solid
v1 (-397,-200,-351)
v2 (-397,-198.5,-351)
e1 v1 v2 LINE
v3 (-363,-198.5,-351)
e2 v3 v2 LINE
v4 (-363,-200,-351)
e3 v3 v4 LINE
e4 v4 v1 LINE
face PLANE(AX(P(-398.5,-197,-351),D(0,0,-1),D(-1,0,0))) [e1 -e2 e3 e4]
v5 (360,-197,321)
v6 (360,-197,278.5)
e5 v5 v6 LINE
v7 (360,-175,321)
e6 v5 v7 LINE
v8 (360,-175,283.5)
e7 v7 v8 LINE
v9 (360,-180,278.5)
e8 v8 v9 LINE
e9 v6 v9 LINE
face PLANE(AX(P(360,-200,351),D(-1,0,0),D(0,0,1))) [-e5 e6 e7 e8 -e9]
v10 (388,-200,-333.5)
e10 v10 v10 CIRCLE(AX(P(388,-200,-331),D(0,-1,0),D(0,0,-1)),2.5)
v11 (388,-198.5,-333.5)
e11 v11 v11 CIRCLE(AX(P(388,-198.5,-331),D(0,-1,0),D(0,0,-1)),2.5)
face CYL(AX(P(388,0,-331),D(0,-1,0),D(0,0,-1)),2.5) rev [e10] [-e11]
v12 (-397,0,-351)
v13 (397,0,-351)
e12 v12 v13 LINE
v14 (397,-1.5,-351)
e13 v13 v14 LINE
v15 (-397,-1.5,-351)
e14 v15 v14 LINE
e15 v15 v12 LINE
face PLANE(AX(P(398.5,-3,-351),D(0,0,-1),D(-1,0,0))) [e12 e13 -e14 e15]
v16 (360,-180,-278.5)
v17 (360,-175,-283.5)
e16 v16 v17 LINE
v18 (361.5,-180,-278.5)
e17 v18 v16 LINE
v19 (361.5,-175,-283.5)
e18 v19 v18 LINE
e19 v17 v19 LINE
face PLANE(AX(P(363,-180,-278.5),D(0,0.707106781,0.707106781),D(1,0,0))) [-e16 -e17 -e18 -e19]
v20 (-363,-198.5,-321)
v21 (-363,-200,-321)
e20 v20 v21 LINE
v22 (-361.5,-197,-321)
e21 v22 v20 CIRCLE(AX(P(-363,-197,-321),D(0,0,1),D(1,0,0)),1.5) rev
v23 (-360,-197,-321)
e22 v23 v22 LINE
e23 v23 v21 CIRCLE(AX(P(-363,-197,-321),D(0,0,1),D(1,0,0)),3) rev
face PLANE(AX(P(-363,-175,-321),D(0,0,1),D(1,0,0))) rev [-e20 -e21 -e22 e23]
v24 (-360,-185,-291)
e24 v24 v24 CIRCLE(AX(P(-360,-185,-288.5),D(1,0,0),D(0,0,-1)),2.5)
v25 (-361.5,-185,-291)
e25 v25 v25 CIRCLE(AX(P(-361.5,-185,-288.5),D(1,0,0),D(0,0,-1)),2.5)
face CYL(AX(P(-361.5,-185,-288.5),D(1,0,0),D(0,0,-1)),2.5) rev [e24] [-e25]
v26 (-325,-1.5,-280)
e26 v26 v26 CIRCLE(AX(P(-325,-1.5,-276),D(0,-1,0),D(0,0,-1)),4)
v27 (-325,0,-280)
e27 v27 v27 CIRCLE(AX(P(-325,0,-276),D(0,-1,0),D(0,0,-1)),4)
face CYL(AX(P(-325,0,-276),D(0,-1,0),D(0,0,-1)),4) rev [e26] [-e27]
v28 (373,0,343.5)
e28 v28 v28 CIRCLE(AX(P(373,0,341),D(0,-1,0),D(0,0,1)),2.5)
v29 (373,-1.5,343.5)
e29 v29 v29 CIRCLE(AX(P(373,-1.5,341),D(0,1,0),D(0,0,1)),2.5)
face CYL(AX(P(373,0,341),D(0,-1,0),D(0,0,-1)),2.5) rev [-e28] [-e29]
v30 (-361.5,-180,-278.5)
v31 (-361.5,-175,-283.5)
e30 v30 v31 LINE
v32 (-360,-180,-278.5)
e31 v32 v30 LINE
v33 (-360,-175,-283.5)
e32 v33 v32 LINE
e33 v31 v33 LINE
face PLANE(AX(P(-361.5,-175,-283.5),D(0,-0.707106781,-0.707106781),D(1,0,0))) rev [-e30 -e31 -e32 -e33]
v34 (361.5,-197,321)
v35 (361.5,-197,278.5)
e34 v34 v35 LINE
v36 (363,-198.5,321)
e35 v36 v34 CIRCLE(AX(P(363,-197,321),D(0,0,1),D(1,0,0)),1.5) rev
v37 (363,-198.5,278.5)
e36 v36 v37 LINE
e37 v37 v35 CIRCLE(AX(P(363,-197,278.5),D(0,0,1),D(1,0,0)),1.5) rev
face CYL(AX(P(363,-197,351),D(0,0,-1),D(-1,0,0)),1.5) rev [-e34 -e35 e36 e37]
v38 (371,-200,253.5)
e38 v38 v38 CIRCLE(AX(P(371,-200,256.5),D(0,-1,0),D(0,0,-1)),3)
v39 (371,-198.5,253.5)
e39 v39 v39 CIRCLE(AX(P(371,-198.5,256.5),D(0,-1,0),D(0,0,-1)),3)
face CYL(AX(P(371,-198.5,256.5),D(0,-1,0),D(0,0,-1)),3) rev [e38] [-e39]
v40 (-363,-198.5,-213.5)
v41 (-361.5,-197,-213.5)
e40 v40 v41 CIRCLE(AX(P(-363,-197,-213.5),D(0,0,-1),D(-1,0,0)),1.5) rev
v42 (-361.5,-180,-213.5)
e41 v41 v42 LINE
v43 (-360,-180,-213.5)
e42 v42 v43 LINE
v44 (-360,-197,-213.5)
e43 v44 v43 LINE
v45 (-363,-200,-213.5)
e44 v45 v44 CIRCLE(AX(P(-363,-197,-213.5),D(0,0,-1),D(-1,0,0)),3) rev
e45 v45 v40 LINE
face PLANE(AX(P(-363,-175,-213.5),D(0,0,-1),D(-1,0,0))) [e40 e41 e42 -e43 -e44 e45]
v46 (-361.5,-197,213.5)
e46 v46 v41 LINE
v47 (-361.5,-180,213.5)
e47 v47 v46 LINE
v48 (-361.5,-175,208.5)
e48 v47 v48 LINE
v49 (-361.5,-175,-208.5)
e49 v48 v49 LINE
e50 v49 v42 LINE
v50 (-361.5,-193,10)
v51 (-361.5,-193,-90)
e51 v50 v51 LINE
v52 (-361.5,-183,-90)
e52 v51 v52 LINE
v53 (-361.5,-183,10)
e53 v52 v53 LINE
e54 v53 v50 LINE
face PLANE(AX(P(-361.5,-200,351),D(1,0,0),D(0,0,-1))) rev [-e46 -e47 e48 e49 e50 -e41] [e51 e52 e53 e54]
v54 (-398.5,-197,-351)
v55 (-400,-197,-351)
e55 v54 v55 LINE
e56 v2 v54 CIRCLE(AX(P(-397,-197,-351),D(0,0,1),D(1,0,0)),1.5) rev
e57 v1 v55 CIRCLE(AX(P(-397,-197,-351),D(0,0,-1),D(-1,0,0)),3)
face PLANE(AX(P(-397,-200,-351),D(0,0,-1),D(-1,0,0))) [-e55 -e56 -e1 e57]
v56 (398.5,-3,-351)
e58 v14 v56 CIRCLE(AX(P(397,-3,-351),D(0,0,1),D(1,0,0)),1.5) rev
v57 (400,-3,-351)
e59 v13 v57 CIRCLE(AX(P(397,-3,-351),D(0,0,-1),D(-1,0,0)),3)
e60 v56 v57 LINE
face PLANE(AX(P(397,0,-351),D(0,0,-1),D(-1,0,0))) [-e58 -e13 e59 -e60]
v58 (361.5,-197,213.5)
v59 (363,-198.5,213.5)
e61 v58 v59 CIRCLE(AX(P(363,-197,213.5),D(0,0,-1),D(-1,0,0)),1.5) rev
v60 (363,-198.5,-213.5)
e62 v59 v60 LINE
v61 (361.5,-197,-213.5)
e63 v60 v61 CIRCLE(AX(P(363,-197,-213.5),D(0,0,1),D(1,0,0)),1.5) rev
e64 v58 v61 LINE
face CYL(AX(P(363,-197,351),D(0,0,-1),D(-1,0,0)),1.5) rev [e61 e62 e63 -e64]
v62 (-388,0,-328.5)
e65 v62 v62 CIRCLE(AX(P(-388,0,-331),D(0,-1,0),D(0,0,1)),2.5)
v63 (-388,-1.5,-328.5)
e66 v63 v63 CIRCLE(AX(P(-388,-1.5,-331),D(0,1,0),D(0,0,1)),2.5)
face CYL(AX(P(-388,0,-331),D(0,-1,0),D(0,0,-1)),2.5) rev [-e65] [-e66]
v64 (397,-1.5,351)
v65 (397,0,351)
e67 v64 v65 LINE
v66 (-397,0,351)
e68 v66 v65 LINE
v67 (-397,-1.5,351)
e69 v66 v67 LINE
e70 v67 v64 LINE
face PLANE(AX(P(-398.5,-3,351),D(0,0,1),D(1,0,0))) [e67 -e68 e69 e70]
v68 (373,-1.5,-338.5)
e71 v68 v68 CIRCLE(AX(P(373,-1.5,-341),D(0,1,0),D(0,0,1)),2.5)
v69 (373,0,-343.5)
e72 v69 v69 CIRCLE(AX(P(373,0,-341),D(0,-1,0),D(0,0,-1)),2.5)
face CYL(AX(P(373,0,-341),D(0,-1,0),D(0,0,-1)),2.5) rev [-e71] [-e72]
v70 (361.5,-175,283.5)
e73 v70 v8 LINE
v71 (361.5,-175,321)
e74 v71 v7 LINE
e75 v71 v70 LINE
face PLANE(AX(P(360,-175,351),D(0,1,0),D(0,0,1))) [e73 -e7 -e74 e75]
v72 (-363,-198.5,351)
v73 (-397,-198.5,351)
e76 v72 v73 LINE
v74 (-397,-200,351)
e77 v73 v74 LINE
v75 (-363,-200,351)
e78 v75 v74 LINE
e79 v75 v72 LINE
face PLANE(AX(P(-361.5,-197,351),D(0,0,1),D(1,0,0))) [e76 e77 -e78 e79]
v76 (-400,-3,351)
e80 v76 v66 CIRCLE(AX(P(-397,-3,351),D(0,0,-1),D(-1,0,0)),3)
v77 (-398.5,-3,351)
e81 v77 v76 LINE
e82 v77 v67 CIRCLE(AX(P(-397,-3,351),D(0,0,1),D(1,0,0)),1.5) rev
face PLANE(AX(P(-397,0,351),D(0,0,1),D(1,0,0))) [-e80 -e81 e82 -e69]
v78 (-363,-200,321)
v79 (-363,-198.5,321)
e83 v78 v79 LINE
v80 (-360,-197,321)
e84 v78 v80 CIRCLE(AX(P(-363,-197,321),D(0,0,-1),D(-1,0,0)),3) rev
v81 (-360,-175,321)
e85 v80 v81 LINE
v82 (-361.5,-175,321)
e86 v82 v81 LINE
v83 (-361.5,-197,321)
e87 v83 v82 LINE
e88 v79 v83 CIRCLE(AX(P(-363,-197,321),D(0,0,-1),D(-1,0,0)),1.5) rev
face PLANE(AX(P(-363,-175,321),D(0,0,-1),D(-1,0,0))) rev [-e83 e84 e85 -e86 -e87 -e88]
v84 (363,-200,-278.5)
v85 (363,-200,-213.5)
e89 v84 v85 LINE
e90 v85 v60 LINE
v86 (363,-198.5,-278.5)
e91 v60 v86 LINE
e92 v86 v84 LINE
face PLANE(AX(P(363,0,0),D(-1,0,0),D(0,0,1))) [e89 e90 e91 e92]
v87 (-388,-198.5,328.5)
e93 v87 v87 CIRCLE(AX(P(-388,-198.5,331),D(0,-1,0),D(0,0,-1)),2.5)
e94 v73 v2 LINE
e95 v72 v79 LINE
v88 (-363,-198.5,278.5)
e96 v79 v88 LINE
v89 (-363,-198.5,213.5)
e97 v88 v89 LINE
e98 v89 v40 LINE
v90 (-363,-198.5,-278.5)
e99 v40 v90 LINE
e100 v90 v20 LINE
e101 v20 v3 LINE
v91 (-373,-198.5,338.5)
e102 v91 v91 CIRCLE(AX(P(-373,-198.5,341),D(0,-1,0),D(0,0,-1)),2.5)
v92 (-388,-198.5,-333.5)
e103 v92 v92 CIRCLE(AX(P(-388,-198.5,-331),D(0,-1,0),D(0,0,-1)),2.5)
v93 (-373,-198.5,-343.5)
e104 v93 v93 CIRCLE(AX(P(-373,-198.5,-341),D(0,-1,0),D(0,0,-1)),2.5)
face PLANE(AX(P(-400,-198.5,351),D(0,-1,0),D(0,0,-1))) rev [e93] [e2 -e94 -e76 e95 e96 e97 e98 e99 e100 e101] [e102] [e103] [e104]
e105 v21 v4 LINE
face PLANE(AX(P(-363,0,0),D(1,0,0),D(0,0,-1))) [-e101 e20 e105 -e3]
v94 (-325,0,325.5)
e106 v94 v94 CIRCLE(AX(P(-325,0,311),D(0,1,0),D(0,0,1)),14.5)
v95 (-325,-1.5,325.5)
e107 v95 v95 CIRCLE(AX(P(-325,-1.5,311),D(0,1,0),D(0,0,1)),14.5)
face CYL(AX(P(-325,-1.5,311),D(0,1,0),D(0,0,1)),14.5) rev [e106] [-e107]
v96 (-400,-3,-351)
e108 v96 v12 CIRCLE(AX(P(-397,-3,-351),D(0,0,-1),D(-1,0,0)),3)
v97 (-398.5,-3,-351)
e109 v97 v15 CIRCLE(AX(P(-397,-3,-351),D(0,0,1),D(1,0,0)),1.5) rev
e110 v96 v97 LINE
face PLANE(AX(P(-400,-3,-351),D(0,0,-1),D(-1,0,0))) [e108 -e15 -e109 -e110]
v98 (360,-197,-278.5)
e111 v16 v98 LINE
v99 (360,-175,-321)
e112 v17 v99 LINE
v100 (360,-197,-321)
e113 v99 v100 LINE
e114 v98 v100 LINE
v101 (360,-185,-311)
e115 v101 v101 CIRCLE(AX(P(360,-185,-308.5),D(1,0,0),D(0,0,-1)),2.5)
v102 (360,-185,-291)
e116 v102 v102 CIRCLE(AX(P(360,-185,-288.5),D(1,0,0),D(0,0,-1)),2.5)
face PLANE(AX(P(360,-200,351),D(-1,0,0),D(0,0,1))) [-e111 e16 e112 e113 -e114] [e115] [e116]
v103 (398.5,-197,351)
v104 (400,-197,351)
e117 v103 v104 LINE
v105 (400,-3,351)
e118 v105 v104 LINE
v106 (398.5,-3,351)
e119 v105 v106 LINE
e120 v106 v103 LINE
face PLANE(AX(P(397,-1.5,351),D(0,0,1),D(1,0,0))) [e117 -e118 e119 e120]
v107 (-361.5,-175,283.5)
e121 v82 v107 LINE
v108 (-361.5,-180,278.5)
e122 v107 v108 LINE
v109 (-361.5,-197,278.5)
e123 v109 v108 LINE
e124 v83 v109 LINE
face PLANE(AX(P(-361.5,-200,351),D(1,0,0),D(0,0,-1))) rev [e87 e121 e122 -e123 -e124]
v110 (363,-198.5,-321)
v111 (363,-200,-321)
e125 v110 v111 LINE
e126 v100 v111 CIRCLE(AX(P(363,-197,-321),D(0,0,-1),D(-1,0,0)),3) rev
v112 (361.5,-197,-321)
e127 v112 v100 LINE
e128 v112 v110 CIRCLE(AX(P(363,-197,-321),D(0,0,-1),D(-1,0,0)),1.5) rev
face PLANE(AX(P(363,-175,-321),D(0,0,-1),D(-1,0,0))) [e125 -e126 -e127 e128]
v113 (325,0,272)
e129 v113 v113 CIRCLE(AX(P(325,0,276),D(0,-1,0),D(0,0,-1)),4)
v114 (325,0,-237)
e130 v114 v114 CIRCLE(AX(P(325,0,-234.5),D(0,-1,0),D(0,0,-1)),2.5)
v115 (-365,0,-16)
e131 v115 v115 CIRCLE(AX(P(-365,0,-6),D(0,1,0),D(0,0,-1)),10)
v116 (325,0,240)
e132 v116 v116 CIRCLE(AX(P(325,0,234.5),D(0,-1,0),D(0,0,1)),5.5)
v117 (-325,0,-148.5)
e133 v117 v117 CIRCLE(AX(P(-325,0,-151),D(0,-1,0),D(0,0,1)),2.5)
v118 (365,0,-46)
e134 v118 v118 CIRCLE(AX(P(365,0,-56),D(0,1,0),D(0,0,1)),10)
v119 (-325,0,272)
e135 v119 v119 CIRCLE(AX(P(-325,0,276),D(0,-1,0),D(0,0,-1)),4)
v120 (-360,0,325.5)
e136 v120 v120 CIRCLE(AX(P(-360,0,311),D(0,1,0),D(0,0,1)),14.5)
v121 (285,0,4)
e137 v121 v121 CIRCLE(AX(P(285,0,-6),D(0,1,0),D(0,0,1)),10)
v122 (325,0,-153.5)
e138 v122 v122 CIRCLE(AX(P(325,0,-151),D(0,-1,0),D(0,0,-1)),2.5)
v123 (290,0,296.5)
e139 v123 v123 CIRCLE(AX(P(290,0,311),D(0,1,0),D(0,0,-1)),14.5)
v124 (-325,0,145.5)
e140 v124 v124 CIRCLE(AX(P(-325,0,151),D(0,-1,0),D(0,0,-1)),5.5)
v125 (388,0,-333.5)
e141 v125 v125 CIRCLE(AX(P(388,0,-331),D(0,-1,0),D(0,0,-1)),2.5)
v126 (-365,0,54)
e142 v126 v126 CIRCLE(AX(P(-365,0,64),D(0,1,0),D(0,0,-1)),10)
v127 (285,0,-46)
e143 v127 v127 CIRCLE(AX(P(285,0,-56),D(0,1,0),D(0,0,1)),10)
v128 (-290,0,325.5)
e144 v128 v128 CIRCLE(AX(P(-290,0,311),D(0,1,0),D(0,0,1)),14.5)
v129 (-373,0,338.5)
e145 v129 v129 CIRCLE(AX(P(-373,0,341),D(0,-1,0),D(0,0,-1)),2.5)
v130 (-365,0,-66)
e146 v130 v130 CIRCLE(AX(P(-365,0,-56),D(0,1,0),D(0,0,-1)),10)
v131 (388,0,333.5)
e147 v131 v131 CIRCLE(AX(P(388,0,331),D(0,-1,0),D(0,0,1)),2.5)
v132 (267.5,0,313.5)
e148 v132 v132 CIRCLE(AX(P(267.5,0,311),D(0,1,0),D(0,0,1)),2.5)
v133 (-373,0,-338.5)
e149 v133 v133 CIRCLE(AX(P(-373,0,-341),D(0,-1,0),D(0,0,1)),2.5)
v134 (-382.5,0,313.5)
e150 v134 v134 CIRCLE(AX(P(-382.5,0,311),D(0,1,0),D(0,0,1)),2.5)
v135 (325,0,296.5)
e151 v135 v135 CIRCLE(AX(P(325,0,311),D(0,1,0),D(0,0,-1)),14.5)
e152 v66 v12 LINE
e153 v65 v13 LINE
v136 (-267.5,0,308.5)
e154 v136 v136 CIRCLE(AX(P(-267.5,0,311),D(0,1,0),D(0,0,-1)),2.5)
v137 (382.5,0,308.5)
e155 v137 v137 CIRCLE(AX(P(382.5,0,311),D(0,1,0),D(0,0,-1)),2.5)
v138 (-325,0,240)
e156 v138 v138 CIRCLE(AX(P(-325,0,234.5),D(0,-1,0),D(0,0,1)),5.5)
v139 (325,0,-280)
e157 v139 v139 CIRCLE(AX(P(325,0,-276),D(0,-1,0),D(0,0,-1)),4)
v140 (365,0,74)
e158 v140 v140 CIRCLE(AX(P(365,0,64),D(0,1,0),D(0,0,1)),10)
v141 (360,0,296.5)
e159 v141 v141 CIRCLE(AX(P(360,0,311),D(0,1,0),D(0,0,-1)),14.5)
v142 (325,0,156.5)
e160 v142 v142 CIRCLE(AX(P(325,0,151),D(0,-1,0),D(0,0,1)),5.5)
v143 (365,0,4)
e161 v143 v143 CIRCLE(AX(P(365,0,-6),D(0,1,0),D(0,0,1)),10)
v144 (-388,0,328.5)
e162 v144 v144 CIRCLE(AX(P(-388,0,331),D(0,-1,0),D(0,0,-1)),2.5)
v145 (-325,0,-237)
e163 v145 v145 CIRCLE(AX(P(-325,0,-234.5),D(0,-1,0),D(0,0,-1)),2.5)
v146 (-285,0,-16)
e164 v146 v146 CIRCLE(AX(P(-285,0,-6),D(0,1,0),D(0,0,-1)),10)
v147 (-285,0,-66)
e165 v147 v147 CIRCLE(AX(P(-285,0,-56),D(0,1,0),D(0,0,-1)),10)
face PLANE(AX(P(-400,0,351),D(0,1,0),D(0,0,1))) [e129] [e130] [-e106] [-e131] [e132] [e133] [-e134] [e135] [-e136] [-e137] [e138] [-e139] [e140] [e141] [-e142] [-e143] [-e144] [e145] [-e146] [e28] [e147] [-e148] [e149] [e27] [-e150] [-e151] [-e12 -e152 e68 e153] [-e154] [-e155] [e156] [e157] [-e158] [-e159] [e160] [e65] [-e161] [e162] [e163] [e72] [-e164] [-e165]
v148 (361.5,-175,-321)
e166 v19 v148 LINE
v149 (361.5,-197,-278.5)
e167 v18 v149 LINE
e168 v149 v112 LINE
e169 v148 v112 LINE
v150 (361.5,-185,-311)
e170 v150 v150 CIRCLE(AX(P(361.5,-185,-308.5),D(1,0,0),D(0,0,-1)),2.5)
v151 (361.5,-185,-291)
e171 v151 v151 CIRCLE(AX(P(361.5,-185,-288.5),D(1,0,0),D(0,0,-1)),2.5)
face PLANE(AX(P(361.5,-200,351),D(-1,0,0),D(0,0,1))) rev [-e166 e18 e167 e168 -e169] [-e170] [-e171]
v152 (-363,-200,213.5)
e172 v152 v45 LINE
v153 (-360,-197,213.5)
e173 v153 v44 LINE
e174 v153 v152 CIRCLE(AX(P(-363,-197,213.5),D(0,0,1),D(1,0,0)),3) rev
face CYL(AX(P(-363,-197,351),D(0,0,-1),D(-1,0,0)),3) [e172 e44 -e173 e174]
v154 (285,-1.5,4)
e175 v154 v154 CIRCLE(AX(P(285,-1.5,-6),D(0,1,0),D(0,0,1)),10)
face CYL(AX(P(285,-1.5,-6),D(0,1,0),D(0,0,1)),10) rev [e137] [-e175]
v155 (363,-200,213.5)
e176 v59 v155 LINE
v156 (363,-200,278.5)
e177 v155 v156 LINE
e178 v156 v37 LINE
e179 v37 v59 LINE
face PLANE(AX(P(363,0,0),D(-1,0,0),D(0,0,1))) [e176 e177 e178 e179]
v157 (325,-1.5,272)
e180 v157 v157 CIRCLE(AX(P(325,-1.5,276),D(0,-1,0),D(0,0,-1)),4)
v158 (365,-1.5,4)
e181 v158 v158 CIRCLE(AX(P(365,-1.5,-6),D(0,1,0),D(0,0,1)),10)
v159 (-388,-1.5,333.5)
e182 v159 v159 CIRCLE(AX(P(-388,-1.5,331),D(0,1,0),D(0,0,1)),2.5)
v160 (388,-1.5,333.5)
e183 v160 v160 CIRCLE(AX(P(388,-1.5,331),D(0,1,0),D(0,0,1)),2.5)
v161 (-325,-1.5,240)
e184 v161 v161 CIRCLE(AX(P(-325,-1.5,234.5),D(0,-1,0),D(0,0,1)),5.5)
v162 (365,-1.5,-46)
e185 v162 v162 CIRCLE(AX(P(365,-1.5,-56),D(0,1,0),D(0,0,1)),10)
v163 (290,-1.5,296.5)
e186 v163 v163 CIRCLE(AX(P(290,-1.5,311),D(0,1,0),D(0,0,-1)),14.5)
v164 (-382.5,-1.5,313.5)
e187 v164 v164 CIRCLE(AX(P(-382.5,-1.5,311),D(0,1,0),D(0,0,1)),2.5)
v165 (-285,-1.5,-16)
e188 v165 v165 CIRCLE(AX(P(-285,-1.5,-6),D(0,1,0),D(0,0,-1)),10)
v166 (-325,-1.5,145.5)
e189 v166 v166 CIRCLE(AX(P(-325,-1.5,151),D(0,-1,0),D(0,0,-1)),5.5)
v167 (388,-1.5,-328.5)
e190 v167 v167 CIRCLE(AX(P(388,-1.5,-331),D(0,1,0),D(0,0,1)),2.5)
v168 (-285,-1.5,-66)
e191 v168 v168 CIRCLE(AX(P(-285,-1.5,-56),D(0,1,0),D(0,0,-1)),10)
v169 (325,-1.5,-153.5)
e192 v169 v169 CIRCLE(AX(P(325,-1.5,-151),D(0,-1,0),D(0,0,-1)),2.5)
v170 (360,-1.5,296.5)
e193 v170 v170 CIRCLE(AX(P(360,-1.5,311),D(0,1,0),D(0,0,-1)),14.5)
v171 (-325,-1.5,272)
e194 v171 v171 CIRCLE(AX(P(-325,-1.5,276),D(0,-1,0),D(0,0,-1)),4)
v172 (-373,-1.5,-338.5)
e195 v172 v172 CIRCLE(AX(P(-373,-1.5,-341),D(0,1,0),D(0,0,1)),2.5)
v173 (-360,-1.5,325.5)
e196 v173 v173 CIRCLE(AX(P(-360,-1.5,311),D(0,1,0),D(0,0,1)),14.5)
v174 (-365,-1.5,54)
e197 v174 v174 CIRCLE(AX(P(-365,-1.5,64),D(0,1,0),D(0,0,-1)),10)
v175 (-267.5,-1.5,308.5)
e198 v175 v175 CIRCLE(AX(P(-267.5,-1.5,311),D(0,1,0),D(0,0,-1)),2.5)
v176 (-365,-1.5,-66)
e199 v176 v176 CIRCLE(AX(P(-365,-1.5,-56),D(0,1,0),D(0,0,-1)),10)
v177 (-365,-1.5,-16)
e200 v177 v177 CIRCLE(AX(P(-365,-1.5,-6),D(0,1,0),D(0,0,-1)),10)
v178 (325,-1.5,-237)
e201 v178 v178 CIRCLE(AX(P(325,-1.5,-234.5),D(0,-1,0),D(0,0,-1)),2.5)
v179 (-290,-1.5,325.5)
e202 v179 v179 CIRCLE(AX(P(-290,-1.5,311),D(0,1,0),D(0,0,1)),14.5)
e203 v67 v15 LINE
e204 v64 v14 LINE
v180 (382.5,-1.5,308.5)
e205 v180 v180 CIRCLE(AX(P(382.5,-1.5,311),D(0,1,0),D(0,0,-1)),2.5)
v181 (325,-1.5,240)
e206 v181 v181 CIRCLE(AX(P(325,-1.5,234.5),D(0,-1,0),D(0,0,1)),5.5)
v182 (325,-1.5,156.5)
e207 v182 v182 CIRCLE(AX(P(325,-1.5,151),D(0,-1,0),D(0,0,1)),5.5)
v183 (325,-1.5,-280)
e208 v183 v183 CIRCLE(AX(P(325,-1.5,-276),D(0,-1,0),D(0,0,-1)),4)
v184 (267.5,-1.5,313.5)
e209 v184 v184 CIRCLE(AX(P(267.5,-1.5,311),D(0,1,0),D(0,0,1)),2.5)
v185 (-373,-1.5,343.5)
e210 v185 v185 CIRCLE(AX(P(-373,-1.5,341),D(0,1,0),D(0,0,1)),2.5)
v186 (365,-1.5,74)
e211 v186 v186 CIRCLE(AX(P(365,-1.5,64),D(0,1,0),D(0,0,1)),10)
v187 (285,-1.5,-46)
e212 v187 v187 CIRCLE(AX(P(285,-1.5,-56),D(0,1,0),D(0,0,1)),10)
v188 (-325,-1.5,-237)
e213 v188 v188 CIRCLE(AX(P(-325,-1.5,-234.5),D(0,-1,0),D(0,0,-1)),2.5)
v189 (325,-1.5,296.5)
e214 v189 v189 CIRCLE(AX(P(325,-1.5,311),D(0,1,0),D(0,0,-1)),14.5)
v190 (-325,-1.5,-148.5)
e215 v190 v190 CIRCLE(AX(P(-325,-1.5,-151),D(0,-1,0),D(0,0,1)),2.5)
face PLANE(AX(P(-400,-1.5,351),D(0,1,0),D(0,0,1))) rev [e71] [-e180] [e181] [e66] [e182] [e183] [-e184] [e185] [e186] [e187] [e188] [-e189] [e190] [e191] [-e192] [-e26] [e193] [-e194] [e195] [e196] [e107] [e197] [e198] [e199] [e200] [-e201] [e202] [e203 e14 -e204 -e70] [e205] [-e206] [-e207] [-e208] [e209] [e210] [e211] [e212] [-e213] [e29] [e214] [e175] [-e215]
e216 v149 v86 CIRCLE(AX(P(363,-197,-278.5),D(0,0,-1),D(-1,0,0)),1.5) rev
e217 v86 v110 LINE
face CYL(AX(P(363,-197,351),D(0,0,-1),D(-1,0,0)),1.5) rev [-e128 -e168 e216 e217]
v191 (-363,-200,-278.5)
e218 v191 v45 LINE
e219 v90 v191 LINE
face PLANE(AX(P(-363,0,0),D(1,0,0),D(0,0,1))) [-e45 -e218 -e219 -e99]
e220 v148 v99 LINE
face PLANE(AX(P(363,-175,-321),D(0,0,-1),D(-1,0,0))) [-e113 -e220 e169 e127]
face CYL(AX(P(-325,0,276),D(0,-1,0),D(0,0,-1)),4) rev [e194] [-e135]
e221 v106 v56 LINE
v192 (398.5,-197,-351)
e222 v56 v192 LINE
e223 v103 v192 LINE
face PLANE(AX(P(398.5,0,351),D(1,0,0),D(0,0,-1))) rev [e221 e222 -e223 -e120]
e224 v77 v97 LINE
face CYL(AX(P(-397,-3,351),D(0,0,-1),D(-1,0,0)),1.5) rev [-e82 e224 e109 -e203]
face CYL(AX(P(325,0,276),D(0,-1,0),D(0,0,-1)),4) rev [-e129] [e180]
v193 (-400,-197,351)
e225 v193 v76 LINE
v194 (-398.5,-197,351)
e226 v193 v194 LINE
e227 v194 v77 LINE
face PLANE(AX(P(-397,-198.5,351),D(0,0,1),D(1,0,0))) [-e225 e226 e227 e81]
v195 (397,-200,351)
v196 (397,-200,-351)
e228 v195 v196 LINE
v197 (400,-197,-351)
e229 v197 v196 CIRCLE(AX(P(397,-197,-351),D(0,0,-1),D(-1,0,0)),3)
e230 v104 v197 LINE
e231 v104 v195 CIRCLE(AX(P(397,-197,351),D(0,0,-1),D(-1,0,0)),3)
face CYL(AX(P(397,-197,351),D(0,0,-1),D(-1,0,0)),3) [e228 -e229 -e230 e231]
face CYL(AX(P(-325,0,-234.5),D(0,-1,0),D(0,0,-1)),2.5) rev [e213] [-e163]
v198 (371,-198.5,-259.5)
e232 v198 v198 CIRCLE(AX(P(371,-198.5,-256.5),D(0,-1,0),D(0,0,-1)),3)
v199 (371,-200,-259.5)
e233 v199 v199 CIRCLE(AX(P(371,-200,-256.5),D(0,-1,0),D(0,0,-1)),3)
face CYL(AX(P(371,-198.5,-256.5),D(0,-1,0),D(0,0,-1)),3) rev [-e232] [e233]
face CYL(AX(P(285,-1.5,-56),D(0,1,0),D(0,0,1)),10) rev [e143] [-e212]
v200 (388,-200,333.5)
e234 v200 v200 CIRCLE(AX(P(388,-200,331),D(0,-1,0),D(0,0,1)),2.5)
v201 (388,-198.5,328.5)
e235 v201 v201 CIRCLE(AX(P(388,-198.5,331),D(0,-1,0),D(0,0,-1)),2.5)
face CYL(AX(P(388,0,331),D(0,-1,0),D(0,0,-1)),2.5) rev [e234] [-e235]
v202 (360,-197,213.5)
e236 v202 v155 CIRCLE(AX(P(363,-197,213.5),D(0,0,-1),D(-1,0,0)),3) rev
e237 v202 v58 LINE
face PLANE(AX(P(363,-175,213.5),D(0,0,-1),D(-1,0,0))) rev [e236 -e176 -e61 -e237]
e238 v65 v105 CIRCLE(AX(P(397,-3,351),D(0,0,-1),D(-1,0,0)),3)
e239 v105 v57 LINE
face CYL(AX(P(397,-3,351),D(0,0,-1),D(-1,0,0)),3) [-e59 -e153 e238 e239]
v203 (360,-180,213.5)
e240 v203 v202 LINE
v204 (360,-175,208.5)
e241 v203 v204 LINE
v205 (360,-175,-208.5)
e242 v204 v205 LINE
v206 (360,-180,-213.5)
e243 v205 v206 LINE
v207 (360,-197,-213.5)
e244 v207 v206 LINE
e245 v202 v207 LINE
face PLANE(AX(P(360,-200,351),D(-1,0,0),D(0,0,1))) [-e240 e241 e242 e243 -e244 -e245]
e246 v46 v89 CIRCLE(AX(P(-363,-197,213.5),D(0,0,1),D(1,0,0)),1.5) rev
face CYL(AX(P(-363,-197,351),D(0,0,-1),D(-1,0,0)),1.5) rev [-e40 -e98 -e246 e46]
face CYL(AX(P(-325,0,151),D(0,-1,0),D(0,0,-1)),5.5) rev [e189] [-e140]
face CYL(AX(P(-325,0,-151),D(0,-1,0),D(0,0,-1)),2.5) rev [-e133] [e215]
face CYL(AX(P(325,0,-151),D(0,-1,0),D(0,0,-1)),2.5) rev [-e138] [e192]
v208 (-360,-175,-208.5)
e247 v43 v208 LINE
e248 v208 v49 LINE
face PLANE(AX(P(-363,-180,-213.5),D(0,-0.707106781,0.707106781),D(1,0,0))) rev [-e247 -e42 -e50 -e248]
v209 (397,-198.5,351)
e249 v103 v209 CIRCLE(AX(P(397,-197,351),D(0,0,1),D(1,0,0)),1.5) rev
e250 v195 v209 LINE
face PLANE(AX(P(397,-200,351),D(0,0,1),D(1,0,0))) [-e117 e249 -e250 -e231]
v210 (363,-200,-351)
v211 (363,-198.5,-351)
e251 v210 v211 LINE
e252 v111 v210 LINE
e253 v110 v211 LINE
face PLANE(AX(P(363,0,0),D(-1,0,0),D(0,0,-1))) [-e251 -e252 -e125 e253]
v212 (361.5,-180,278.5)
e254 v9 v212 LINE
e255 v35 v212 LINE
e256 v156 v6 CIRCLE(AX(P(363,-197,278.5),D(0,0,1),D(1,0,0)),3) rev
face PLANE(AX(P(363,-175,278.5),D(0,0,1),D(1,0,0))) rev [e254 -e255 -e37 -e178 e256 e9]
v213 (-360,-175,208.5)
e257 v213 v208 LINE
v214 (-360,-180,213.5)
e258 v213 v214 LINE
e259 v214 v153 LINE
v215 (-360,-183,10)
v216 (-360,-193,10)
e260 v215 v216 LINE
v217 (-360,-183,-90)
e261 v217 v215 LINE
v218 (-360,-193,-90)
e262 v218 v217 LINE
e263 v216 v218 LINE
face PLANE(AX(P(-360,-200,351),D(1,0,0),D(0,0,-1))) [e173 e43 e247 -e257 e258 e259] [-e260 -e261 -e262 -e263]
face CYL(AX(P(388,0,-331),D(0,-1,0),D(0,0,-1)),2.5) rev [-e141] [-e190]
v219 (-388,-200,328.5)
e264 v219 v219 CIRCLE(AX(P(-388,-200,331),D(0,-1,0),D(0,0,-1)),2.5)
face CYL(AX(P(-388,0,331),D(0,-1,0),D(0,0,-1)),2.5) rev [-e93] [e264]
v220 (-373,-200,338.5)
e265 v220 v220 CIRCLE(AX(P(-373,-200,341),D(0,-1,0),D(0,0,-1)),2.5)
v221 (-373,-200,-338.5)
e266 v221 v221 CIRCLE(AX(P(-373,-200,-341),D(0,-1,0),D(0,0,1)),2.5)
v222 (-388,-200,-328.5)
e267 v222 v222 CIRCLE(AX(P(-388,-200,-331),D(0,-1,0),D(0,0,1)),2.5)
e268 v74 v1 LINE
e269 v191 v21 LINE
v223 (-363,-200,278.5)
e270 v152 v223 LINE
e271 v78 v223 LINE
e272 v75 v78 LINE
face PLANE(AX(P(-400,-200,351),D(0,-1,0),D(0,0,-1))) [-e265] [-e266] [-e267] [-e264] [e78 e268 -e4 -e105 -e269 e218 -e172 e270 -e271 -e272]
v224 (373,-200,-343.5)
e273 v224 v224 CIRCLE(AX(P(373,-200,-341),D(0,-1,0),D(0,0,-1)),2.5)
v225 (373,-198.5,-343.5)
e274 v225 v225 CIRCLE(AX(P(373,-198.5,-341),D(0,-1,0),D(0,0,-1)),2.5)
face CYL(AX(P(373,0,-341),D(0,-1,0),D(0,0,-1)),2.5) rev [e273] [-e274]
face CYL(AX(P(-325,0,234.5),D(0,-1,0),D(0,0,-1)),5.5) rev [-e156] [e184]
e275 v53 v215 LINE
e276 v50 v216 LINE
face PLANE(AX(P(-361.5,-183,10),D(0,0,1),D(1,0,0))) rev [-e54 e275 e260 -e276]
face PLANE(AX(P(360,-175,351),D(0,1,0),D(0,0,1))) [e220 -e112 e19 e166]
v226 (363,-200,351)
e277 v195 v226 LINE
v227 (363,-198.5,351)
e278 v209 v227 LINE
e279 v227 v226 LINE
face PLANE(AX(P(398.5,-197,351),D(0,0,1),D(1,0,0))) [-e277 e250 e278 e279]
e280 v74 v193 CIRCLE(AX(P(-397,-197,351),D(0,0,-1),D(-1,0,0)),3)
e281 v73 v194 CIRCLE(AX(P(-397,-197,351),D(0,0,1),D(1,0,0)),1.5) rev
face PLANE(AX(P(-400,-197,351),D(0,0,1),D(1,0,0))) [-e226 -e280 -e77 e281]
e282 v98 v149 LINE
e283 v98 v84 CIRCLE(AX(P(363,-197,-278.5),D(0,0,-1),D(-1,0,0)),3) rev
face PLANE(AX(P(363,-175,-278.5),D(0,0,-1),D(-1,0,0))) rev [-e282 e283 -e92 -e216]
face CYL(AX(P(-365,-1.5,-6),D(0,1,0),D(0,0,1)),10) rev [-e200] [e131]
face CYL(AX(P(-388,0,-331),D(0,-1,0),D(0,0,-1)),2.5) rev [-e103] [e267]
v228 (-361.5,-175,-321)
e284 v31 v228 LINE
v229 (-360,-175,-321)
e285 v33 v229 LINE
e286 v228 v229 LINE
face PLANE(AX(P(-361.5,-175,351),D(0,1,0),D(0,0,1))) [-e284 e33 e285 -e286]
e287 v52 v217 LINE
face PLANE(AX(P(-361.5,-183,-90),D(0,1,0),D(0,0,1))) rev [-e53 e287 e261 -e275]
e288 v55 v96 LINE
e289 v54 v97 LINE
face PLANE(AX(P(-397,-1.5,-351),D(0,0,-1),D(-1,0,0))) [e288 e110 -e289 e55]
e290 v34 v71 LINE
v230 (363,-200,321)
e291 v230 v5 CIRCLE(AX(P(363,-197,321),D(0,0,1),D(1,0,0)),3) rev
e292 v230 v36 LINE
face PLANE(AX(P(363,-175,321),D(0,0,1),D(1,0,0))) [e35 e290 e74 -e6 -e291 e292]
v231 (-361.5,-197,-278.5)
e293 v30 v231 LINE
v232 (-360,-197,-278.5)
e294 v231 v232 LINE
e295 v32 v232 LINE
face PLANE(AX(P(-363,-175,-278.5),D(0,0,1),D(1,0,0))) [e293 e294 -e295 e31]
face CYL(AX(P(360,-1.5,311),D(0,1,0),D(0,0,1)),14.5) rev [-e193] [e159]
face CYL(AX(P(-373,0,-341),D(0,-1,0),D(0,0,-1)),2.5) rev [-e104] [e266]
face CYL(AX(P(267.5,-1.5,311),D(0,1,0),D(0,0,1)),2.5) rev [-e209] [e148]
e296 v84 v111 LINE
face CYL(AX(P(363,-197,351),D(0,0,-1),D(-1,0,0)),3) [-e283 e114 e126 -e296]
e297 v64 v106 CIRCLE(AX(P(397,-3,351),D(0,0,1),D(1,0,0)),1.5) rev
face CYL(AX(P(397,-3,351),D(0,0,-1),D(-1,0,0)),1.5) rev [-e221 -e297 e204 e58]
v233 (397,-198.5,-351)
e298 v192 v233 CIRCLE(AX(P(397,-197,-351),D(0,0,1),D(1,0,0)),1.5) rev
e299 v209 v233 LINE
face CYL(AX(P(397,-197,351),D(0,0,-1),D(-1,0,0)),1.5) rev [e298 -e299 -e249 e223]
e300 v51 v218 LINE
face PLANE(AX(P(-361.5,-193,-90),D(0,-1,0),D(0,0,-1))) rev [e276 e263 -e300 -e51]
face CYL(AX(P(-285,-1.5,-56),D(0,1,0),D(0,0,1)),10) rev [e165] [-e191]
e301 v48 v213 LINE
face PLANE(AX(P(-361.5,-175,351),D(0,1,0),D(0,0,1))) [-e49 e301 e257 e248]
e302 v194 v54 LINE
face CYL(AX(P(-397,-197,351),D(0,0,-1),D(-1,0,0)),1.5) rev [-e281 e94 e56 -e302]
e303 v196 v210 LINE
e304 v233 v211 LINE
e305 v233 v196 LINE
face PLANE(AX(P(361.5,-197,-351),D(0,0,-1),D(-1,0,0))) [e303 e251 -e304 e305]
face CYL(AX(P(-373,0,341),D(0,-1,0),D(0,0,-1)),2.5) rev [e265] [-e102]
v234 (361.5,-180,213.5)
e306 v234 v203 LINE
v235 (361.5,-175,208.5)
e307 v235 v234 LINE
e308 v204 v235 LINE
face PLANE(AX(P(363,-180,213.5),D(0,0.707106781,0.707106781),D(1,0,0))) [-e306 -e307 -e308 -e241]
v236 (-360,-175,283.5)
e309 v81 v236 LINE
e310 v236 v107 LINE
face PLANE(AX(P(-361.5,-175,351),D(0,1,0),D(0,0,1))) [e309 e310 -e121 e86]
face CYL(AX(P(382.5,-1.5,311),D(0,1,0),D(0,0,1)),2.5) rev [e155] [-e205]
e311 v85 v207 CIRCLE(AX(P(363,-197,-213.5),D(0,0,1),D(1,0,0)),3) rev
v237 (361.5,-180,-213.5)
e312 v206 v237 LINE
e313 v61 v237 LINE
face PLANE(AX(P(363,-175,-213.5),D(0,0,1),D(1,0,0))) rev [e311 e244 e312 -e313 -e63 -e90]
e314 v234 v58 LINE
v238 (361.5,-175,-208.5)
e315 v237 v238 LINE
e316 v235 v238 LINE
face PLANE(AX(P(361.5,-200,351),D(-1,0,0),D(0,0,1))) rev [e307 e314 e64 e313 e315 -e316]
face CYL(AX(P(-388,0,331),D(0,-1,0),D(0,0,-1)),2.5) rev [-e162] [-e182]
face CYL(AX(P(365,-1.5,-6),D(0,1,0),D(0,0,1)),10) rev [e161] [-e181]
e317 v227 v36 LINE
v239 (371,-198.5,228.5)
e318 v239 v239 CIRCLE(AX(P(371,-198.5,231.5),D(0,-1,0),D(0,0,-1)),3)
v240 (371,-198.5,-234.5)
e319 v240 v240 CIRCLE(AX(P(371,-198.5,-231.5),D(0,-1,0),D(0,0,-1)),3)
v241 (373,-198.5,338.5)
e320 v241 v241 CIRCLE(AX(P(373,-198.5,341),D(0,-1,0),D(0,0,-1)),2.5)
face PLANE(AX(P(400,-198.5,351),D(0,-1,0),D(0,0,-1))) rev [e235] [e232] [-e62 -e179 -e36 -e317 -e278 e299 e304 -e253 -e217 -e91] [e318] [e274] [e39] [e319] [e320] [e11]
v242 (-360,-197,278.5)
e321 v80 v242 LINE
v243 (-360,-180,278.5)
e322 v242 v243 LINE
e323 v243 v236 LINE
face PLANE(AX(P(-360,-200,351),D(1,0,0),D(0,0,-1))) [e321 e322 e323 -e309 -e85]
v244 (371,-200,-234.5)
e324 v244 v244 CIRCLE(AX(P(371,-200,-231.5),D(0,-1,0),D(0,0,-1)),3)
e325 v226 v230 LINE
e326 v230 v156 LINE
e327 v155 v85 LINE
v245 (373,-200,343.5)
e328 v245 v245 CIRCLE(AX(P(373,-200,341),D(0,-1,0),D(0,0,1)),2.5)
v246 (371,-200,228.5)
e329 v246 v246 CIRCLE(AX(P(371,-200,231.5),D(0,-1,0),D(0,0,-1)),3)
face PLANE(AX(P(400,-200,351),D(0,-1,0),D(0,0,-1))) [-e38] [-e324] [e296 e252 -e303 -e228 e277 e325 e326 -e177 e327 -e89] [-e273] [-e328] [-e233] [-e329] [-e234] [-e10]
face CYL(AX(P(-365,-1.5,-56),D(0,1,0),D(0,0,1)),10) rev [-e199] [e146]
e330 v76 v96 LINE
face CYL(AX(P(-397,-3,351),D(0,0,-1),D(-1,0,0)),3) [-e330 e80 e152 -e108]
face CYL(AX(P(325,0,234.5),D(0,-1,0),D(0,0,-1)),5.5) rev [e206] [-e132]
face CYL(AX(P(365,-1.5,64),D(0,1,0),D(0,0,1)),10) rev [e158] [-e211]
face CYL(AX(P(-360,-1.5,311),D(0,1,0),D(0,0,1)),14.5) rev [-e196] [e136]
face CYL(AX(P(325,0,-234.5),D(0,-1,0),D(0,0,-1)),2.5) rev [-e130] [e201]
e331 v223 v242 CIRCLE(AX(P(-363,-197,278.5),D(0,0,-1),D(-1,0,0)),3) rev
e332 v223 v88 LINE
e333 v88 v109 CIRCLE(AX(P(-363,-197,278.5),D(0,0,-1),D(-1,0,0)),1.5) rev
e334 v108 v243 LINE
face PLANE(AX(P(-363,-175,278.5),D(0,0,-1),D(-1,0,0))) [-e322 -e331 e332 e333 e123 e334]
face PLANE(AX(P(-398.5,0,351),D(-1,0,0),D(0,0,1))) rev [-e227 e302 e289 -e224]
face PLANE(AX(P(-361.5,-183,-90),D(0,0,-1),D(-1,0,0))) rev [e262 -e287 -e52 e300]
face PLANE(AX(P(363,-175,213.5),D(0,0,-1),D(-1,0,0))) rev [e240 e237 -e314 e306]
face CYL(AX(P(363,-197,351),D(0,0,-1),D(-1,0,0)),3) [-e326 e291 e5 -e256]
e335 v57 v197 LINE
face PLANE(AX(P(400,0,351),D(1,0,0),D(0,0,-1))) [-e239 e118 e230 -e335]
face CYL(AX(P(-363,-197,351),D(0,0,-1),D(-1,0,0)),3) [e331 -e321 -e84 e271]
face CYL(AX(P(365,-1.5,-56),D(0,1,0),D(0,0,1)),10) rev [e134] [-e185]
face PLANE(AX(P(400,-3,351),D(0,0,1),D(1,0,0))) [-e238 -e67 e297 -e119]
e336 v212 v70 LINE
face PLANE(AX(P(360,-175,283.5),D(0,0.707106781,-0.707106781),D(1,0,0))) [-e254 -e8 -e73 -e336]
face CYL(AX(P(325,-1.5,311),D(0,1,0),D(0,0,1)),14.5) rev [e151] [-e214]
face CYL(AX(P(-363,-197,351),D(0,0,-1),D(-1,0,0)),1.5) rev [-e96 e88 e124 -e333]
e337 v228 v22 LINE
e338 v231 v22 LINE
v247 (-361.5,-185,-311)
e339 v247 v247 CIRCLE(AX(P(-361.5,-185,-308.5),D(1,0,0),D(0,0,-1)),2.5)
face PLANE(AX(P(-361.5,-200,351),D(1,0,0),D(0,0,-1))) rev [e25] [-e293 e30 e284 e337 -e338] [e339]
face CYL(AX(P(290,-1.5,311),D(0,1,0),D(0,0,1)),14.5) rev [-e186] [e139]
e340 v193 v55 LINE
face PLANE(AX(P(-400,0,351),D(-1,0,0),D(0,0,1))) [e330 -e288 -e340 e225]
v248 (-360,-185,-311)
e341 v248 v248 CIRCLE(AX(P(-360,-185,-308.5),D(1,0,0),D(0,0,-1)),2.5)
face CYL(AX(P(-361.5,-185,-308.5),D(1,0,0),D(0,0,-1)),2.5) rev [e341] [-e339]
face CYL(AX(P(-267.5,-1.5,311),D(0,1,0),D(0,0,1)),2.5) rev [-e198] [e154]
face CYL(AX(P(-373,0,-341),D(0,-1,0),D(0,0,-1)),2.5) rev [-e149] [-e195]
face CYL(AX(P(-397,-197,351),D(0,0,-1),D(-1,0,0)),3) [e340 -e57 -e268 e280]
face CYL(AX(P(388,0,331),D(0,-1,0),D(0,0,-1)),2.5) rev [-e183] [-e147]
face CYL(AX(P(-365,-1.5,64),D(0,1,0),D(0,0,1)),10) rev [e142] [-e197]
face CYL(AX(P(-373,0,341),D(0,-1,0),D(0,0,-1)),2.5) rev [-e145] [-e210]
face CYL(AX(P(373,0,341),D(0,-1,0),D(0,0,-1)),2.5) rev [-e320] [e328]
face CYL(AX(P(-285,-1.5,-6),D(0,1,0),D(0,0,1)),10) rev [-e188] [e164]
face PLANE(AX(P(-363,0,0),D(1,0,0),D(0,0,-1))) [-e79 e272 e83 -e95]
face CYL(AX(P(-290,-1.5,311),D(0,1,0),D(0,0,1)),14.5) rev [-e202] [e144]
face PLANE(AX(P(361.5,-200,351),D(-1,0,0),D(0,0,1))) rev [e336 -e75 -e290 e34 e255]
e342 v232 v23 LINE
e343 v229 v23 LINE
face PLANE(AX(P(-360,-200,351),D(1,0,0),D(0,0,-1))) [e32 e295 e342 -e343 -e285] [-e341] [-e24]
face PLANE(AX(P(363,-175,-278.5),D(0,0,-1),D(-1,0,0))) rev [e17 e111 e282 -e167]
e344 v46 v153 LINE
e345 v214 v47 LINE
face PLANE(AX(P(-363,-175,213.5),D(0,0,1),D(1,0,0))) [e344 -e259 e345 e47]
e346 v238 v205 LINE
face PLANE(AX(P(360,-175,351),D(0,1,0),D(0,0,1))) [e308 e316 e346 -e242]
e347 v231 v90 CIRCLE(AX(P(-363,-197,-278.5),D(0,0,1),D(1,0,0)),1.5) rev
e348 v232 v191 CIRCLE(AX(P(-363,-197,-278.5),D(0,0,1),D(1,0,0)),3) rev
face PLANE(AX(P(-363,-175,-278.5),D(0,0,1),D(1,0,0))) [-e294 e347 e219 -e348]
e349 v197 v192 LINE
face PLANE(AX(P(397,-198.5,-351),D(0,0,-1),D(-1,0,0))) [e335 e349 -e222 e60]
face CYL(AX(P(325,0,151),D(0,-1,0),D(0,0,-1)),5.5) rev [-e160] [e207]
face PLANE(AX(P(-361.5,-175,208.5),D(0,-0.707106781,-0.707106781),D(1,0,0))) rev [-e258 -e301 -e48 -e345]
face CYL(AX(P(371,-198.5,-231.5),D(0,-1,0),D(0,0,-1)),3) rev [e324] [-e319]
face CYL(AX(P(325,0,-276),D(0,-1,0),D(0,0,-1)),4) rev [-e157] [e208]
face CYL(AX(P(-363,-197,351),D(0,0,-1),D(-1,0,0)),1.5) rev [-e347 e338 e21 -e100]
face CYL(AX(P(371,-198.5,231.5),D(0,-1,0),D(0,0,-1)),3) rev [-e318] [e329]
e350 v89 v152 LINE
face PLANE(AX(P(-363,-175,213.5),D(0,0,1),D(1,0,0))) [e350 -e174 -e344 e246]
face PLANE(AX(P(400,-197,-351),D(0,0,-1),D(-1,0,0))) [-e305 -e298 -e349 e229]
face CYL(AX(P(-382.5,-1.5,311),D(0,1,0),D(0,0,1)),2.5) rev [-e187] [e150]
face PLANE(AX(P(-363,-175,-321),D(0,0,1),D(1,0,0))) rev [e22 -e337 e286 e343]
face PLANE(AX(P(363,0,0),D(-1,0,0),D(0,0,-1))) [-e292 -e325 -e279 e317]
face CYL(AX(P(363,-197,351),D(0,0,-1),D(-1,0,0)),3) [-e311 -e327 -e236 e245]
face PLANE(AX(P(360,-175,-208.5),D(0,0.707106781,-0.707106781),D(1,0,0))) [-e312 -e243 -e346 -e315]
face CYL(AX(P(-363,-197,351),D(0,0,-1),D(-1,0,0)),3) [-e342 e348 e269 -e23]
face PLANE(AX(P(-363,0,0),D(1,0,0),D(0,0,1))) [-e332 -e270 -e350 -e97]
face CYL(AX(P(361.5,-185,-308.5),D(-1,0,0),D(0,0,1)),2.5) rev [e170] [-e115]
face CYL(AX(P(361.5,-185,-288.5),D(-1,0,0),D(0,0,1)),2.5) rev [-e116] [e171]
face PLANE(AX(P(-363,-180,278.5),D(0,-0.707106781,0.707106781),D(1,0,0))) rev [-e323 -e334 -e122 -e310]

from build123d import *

# Parameters (mm, degrees)
SM_BASE_FLANGE_1_DEPTH = 351
SKETCH_6_W             = 30
SKETCH_6_H             = 25
CUT_EXTRUDE_1_DEPTH    = 3
SKETCH_7_R             = 2.5
CUT_EXTRUDE_1299_DEPTH = 569.507695638
SKETCH_8_R             = 3
CUT_EXTRUDE_1710_DEPTH = 1.5
SKETCH_10_W            = 65
SKETCH_10_H            = 25
CUT_EXTRUDE_4_DEPTH    = 3
OTHER_START            = -361.5
OTHER_1_DEPTH          = 723
SKETCH_11_R            = 10
CUT_EXTRUDE_2693_DEPTH = 10
SKETCH_12_R            = 4
CUT_EXTRUDE_3148_DEPTH = 10
SKETCH_13_R            = 2.5
SKETCH_13_R_2          = 5.5
CUT_EXTRUDE_3688_DEPTH = 10
SKETCH_15_R            = 14.5
SKETCH_15_R_2          = 2.5
CUT_EXTRUDE_4428_DEPTH = 1.5
SKETCH_16_R            = 2.5
CUT_EXTRUDE_5_DEPTH    = 10
SKETCH_17_W            = 100
SKETCH_17_H            = 10
CUT_EXTRUDE_6_DEPTH    = 10


# Read off the part's stored shape, not the designer's step: Затупленный угол1
# Sheet-metal steps are written as plain solids
with BuildPart() as part:
    # Sketch 1 → Базовая кромка1 (new, symmetric)
    with BuildSketch(Plane.XY):
        with BuildLine():
            Line((360, -175), (360, -197))
            ThreePointArc((360, -197), (360.878679656, -199.121320344), (363, -200))
            Line((363, -200), (397, -200))
            ThreePointArc((397, -200), (399.121320344, -199.121320344), (400, -197))
            Line((400, -197), (400, -3))
            ThreePointArc((400, -3), (399.121320344, -0.878679656), (397, 0))
            Line((397, 0), (-397, 0))
            ThreePointArc((-397, 0), (-399.121320344, -0.878679656), (-400, -3))
            Line((-400, -3), (-400, -197))
            ThreePointArc((-400, -197), (-399.121320344, -199.121320344), (-397, -200))
            Line((-397, -200), (-363, -200))
            ThreePointArc((-363, -200), (-360.878679656, -199.121320344), (-360, -197))
            Line((-360, -197), (-360, -175))
            Line((-360, -175), (-361.5, -175))
            Line((-361.5, -175), (-361.5, -197))
            ThreePointArc((-361.5, -197), (-361.939339828, -198.060660172), (-363, -198.5))
            Line((-363, -198.5), (-397, -198.5))
            ThreePointArc((-397, -198.5), (-398.060660172, -198.060660172), (-398.5, -197))
            Line((-398.5, -197), (-398.5, -3))
            ThreePointArc((-398.5, -3), (-398.060660172, -1.939339828), (-397, -1.5))
            Line((-397, -1.5), (397, -1.5))
            ThreePointArc((397, -1.5), (398.060660172, -1.939339828), (398.5, -3))
            Line((398.5, -3), (398.5, -197))
            ThreePointArc((398.5, -197), (398.060660172, -198.060660172), (397, -198.5))
            Line((397, -198.5), (363, -198.5))
            ThreePointArc((363, -198.5), (361.939339828, -198.060660172), (361.5, -197))
            Line((361.5, -197), (361.5, -175))
            Line((361.5, -175), (360, -175))
        make_face()
    extrude(amount=SM_BASE_FLANGE_1_DEPTH, both=True)

    # Эскиз6 → Вырез-Вытянуть1 (cut)
    with BuildSketch(Plane(origin=(-360, 0, 0), x_dir=(0, 0, -1), z_dir=(1, 0, 0))):
        with Locations((-336, -187.5)):
            Rectangle(SKETCH_6_W, SKETCH_6_H)
        with Locations((336, -187.5)):
            Rectangle(SKETCH_6_W, SKETCH_6_H)
    cut_extrude_1 = extrude(amount=-CUT_EXTRUDE_1_DEPTH, mode=Mode.SUBTRACT)

    # Зеркальное отражение1: Вырез-Вытянуть1 across plane
    add(cut_extrude_1.mirror(Plane(origin=(0, 0, 0), x_dir=(0, 0, 1), z_dir=(1, 0, 0))), mode=Mode.SUBTRACT)

    # Эскиз7 → Cut-Extrude 1299 (cut, through all)
    with BuildSketch(Plane.XZ.offset(200)):
        with Locations(Location((-388, 331, 0), (0, 0, 270))):
            Circle(SKETCH_7_R)
        with Locations(Location((-373, 341, 0), (0, 0, 270))):
            Circle(SKETCH_7_R)
        with Locations(Location((-373, -341, 0), (0, 0, 90))):
            Circle(SKETCH_7_R)
        with Locations(Location((-388, -331, 0), (0, 0, 90))):
            Circle(SKETCH_7_R)
        with Locations(Location((388, -331, 0), (0, 0, 270))):
            Circle(SKETCH_7_R)
        with Locations(Location((373, -341, 0), (0, 0, 270))):
            Circle(SKETCH_7_R)
        with Locations(Location((373, 341, 0), (0, 0, 270))):
            Circle(SKETCH_7_R)
        with Locations(Location((388, 331, 0), (0, 0, 270))):
            Circle(SKETCH_7_R)
    extrude(amount=-CUT_EXTRUDE_1299_DEPTH, mode=Mode.SUBTRACT)

    # Эскиз8 → Cut-Extrude 1710 (cut)
    with BuildSketch(Plane.XZ.offset(200)):
        with Locations(Location((371, 256.5, 0), (0, 0, 270))):
            Circle(SKETCH_8_R)
        with Locations(Location((371, 231.5, 0), (0, 0, 270))):
            Circle(SKETCH_8_R)
        with Locations(Location((371, -231.5, 0), (0, 0, 270))):
            Circle(SKETCH_8_R)
        with Locations(Location((371, -256.5, 0), (0, 0, 270))):
            Circle(SKETCH_8_R)
    extrude(amount=-CUT_EXTRUDE_1710_DEPTH, mode=Mode.SUBTRACT)

    # Эскиз10 → Вырез-Вытянуть4 (cut)
    with BuildSketch(Plane.ZY.offset(-360)):
        with Locations((-246, -187.5)):
            Rectangle(SKETCH_10_W, SKETCH_10_H)
        with Locations((246, -187.5)):
            Rectangle(SKETCH_10_W, SKETCH_10_H)
    cut_extrude_4 = extrude(amount=-CUT_EXTRUDE_4_DEPTH, mode=Mode.SUBTRACT)

    # Зеркальное отражение2: Вырез-Вытянуть4 across plane
    add(cut_extrude_4.mirror(Plane(origin=(0, 0, 0), x_dir=(0, 0, 1), z_dir=(1, 0, 0))), mode=Mode.SUBTRACT)

    # Other 1 outline → Other 1 (cut)
    with BuildSketch(Plane.YZ.offset(OTHER_START)):
        Polygon((-180, 213.5), (-175, 208.5), (-175, 213.5), align=None)
        Polygon((-175, -208.5), (-180, -213.5), (-175, -213.5), align=None)
        Polygon((-180, -278.5), (-175, -283.5), (-175, -278.5), align=None)
        Polygon((-175, 283.5), (-180, 278.5), (-175, 278.5), align=None)
    extrude(amount=OTHER_1_DEPTH, mode=Mode.SUBTRACT)

    # Эскиз11 → Cut-Extrude 2693 (cut)
    with BuildSketch(Plane(origin=(0, 0, 0), x_dir=(1, 0, 0), z_dir=(0, 1, 0))):
        with Locations(Location((365, 6, 0), (0, 0, 270))):
            Circle(SKETCH_11_R)
        with Locations(Location((365, 56, 0), (0, 0, 270))):
            Circle(SKETCH_11_R)
        with Locations(Location((285, 56, 0), (0, 0, 270))):
            Circle(SKETCH_11_R)
        with Locations(Location((285, 6, 0), (0, 0, 270))):
            Circle(SKETCH_11_R)
        with Locations(Location((-285, 6, 0), (0, 0, 90))):
            Circle(SKETCH_11_R)
        with Locations(Location((-285, 56, 0), (0, 0, 90))):
            Circle(SKETCH_11_R)
        with Locations(Location((-365, 56, 0), (0, 0, 90))):
            Circle(SKETCH_11_R)
        with Locations(Location((-365, 6, 0), (0, 0, 90))):
            Circle(SKETCH_11_R)
        with Locations(Location((365, -64, 0), (0, 0, 270))):
            Circle(SKETCH_11_R)
        with Locations(Location((-365, -64, 0), (0, 0, 90))):
            Circle(SKETCH_11_R)
    extrude(amount=-CUT_EXTRUDE_2693_DEPTH, mode=Mode.SUBTRACT)

    # Эскиз12 → Cut-Extrude 3148 (cut)
    with BuildSketch(Plane.XZ.offset(1.5)):
        with Locations(Location((325, -276, 0), (0, 0, 270))):
            Circle(SKETCH_12_R)
        with Locations(Location((325, 276, 0), (0, 0, 270))):
            Circle(SKETCH_12_R)
        with Locations(Location((-325, 276, 0), (0, 0, 270))):
            Circle(SKETCH_12_R)
        with Locations(Location((-325, -276, 0), (0, 0, 270))):
            Circle(SKETCH_12_R)
    extrude(amount=-CUT_EXTRUDE_3148_DEPTH, mode=Mode.SUBTRACT)

    # Эскиз13 → Cut-Extrude 3688 (cut)
    with BuildSketch(Plane.XZ.offset(1.5)):
        with Locations(Location((325, -151, 0), (0, 0, 270))):
            Circle(SKETCH_13_R)
        with Locations(Location((-325, -151, 0), (0, 0, 90))):
            Circle(SKETCH_13_R)
        with Locations(Location((325, -234.5, 0), (0, 0, 270))):
            Circle(SKETCH_13_R)
        with Locations(Location((-325, -234.5, 0), (0, 0, 270))):
            Circle(SKETCH_13_R)
        with Locations(Location((-325, 234.5, 0), (0, 0, 90))):
            Circle(SKETCH_13_R_2)
        with Locations(Location((325, 234.5, 0), (0, 0, 90))):
            Circle(SKETCH_13_R_2)
        with Locations(Location((-325, 151, 0), (0, 0, 270))):
            Circle(SKETCH_13_R_2)
        with Locations(Location((325, 151, 0), (0, 0, 90))):
            Circle(SKETCH_13_R_2)
    extrude(amount=-CUT_EXTRUDE_3688_DEPTH, mode=Mode.SUBTRACT)

    # Эскиз15 → Cut-Extrude 4428 (cut)
    with BuildSketch(Plane(origin=(0, 0, 0), x_dir=(1, 0, 0), z_dir=(0, 1, 0))):
        with Locations(Location((-360, -311, 0), (0, 0, 270))):
            Circle(SKETCH_15_R)
        with Locations(Location((-325, -311, 0), (0, 0, 270))):
            Circle(SKETCH_15_R)
        with Locations(Location((325, -311, 0), (0, 0, 90))):
            Circle(SKETCH_15_R)
        with Locations(Location((360, -311, 0), (0, 0, 90))):
            Circle(SKETCH_15_R)
        with Locations(Location((-290, -311, 0), (0, 0, 270))):
            Circle(SKETCH_15_R)
        with Locations(Location((290, -311, 0), (0, 0, 90))):
            Circle(SKETCH_15_R)
        with Locations(Location((-382.5, -311, 0), (0, 0, 270))):
            Circle(SKETCH_15_R_2)
        with Locations(Location((-267.5, -311, 0), (0, 0, 90))):
            Circle(SKETCH_15_R_2)
        with Locations(Location((382.5, -311, 0), (0, 0, 90))):
            Circle(SKETCH_15_R_2)
        with Locations(Location((267.5, -311, 0), (0, 0, 270))):
            Circle(SKETCH_15_R_2)
    extrude(amount=-CUT_EXTRUDE_4428_DEPTH, mode=Mode.SUBTRACT)

    # Эскиз16 → Вырез-Вытянуть5 (cut)
    with BuildSketch(Plane(origin=(-360, 0, 0), x_dir=(0, 0, -1), z_dir=(1, 0, 0))):
        with Locations((288.5, -185)):
            Circle(SKETCH_16_R)
        with Locations((308.5, -185)):
            Circle(SKETCH_16_R)
    cut_extrude_5 = extrude(amount=-CUT_EXTRUDE_5_DEPTH, mode=Mode.SUBTRACT)

    # Зеркальное отражение3: Вырез-Вытянуть5 across plane
    add(cut_extrude_5.mirror(Plane(origin=(0, 0, 0), x_dir=(0, 0, 1), z_dir=(1, 0, 0))), mode=Mode.SUBTRACT)

    # Эскиз17 → Вырез-Вытянуть6 (cut)
    with BuildSketch(Plane(origin=(-360, 0, 0), x_dir=(0, 0, -1), z_dir=(1, 0, 0))):
        with Locations((40, -188)):
            Rectangle(SKETCH_17_W, SKETCH_17_H)
    extrude(amount=-CUT_EXTRUDE_6_DEPTH, mode=Mode.SUBTRACT)


solid = part.part
